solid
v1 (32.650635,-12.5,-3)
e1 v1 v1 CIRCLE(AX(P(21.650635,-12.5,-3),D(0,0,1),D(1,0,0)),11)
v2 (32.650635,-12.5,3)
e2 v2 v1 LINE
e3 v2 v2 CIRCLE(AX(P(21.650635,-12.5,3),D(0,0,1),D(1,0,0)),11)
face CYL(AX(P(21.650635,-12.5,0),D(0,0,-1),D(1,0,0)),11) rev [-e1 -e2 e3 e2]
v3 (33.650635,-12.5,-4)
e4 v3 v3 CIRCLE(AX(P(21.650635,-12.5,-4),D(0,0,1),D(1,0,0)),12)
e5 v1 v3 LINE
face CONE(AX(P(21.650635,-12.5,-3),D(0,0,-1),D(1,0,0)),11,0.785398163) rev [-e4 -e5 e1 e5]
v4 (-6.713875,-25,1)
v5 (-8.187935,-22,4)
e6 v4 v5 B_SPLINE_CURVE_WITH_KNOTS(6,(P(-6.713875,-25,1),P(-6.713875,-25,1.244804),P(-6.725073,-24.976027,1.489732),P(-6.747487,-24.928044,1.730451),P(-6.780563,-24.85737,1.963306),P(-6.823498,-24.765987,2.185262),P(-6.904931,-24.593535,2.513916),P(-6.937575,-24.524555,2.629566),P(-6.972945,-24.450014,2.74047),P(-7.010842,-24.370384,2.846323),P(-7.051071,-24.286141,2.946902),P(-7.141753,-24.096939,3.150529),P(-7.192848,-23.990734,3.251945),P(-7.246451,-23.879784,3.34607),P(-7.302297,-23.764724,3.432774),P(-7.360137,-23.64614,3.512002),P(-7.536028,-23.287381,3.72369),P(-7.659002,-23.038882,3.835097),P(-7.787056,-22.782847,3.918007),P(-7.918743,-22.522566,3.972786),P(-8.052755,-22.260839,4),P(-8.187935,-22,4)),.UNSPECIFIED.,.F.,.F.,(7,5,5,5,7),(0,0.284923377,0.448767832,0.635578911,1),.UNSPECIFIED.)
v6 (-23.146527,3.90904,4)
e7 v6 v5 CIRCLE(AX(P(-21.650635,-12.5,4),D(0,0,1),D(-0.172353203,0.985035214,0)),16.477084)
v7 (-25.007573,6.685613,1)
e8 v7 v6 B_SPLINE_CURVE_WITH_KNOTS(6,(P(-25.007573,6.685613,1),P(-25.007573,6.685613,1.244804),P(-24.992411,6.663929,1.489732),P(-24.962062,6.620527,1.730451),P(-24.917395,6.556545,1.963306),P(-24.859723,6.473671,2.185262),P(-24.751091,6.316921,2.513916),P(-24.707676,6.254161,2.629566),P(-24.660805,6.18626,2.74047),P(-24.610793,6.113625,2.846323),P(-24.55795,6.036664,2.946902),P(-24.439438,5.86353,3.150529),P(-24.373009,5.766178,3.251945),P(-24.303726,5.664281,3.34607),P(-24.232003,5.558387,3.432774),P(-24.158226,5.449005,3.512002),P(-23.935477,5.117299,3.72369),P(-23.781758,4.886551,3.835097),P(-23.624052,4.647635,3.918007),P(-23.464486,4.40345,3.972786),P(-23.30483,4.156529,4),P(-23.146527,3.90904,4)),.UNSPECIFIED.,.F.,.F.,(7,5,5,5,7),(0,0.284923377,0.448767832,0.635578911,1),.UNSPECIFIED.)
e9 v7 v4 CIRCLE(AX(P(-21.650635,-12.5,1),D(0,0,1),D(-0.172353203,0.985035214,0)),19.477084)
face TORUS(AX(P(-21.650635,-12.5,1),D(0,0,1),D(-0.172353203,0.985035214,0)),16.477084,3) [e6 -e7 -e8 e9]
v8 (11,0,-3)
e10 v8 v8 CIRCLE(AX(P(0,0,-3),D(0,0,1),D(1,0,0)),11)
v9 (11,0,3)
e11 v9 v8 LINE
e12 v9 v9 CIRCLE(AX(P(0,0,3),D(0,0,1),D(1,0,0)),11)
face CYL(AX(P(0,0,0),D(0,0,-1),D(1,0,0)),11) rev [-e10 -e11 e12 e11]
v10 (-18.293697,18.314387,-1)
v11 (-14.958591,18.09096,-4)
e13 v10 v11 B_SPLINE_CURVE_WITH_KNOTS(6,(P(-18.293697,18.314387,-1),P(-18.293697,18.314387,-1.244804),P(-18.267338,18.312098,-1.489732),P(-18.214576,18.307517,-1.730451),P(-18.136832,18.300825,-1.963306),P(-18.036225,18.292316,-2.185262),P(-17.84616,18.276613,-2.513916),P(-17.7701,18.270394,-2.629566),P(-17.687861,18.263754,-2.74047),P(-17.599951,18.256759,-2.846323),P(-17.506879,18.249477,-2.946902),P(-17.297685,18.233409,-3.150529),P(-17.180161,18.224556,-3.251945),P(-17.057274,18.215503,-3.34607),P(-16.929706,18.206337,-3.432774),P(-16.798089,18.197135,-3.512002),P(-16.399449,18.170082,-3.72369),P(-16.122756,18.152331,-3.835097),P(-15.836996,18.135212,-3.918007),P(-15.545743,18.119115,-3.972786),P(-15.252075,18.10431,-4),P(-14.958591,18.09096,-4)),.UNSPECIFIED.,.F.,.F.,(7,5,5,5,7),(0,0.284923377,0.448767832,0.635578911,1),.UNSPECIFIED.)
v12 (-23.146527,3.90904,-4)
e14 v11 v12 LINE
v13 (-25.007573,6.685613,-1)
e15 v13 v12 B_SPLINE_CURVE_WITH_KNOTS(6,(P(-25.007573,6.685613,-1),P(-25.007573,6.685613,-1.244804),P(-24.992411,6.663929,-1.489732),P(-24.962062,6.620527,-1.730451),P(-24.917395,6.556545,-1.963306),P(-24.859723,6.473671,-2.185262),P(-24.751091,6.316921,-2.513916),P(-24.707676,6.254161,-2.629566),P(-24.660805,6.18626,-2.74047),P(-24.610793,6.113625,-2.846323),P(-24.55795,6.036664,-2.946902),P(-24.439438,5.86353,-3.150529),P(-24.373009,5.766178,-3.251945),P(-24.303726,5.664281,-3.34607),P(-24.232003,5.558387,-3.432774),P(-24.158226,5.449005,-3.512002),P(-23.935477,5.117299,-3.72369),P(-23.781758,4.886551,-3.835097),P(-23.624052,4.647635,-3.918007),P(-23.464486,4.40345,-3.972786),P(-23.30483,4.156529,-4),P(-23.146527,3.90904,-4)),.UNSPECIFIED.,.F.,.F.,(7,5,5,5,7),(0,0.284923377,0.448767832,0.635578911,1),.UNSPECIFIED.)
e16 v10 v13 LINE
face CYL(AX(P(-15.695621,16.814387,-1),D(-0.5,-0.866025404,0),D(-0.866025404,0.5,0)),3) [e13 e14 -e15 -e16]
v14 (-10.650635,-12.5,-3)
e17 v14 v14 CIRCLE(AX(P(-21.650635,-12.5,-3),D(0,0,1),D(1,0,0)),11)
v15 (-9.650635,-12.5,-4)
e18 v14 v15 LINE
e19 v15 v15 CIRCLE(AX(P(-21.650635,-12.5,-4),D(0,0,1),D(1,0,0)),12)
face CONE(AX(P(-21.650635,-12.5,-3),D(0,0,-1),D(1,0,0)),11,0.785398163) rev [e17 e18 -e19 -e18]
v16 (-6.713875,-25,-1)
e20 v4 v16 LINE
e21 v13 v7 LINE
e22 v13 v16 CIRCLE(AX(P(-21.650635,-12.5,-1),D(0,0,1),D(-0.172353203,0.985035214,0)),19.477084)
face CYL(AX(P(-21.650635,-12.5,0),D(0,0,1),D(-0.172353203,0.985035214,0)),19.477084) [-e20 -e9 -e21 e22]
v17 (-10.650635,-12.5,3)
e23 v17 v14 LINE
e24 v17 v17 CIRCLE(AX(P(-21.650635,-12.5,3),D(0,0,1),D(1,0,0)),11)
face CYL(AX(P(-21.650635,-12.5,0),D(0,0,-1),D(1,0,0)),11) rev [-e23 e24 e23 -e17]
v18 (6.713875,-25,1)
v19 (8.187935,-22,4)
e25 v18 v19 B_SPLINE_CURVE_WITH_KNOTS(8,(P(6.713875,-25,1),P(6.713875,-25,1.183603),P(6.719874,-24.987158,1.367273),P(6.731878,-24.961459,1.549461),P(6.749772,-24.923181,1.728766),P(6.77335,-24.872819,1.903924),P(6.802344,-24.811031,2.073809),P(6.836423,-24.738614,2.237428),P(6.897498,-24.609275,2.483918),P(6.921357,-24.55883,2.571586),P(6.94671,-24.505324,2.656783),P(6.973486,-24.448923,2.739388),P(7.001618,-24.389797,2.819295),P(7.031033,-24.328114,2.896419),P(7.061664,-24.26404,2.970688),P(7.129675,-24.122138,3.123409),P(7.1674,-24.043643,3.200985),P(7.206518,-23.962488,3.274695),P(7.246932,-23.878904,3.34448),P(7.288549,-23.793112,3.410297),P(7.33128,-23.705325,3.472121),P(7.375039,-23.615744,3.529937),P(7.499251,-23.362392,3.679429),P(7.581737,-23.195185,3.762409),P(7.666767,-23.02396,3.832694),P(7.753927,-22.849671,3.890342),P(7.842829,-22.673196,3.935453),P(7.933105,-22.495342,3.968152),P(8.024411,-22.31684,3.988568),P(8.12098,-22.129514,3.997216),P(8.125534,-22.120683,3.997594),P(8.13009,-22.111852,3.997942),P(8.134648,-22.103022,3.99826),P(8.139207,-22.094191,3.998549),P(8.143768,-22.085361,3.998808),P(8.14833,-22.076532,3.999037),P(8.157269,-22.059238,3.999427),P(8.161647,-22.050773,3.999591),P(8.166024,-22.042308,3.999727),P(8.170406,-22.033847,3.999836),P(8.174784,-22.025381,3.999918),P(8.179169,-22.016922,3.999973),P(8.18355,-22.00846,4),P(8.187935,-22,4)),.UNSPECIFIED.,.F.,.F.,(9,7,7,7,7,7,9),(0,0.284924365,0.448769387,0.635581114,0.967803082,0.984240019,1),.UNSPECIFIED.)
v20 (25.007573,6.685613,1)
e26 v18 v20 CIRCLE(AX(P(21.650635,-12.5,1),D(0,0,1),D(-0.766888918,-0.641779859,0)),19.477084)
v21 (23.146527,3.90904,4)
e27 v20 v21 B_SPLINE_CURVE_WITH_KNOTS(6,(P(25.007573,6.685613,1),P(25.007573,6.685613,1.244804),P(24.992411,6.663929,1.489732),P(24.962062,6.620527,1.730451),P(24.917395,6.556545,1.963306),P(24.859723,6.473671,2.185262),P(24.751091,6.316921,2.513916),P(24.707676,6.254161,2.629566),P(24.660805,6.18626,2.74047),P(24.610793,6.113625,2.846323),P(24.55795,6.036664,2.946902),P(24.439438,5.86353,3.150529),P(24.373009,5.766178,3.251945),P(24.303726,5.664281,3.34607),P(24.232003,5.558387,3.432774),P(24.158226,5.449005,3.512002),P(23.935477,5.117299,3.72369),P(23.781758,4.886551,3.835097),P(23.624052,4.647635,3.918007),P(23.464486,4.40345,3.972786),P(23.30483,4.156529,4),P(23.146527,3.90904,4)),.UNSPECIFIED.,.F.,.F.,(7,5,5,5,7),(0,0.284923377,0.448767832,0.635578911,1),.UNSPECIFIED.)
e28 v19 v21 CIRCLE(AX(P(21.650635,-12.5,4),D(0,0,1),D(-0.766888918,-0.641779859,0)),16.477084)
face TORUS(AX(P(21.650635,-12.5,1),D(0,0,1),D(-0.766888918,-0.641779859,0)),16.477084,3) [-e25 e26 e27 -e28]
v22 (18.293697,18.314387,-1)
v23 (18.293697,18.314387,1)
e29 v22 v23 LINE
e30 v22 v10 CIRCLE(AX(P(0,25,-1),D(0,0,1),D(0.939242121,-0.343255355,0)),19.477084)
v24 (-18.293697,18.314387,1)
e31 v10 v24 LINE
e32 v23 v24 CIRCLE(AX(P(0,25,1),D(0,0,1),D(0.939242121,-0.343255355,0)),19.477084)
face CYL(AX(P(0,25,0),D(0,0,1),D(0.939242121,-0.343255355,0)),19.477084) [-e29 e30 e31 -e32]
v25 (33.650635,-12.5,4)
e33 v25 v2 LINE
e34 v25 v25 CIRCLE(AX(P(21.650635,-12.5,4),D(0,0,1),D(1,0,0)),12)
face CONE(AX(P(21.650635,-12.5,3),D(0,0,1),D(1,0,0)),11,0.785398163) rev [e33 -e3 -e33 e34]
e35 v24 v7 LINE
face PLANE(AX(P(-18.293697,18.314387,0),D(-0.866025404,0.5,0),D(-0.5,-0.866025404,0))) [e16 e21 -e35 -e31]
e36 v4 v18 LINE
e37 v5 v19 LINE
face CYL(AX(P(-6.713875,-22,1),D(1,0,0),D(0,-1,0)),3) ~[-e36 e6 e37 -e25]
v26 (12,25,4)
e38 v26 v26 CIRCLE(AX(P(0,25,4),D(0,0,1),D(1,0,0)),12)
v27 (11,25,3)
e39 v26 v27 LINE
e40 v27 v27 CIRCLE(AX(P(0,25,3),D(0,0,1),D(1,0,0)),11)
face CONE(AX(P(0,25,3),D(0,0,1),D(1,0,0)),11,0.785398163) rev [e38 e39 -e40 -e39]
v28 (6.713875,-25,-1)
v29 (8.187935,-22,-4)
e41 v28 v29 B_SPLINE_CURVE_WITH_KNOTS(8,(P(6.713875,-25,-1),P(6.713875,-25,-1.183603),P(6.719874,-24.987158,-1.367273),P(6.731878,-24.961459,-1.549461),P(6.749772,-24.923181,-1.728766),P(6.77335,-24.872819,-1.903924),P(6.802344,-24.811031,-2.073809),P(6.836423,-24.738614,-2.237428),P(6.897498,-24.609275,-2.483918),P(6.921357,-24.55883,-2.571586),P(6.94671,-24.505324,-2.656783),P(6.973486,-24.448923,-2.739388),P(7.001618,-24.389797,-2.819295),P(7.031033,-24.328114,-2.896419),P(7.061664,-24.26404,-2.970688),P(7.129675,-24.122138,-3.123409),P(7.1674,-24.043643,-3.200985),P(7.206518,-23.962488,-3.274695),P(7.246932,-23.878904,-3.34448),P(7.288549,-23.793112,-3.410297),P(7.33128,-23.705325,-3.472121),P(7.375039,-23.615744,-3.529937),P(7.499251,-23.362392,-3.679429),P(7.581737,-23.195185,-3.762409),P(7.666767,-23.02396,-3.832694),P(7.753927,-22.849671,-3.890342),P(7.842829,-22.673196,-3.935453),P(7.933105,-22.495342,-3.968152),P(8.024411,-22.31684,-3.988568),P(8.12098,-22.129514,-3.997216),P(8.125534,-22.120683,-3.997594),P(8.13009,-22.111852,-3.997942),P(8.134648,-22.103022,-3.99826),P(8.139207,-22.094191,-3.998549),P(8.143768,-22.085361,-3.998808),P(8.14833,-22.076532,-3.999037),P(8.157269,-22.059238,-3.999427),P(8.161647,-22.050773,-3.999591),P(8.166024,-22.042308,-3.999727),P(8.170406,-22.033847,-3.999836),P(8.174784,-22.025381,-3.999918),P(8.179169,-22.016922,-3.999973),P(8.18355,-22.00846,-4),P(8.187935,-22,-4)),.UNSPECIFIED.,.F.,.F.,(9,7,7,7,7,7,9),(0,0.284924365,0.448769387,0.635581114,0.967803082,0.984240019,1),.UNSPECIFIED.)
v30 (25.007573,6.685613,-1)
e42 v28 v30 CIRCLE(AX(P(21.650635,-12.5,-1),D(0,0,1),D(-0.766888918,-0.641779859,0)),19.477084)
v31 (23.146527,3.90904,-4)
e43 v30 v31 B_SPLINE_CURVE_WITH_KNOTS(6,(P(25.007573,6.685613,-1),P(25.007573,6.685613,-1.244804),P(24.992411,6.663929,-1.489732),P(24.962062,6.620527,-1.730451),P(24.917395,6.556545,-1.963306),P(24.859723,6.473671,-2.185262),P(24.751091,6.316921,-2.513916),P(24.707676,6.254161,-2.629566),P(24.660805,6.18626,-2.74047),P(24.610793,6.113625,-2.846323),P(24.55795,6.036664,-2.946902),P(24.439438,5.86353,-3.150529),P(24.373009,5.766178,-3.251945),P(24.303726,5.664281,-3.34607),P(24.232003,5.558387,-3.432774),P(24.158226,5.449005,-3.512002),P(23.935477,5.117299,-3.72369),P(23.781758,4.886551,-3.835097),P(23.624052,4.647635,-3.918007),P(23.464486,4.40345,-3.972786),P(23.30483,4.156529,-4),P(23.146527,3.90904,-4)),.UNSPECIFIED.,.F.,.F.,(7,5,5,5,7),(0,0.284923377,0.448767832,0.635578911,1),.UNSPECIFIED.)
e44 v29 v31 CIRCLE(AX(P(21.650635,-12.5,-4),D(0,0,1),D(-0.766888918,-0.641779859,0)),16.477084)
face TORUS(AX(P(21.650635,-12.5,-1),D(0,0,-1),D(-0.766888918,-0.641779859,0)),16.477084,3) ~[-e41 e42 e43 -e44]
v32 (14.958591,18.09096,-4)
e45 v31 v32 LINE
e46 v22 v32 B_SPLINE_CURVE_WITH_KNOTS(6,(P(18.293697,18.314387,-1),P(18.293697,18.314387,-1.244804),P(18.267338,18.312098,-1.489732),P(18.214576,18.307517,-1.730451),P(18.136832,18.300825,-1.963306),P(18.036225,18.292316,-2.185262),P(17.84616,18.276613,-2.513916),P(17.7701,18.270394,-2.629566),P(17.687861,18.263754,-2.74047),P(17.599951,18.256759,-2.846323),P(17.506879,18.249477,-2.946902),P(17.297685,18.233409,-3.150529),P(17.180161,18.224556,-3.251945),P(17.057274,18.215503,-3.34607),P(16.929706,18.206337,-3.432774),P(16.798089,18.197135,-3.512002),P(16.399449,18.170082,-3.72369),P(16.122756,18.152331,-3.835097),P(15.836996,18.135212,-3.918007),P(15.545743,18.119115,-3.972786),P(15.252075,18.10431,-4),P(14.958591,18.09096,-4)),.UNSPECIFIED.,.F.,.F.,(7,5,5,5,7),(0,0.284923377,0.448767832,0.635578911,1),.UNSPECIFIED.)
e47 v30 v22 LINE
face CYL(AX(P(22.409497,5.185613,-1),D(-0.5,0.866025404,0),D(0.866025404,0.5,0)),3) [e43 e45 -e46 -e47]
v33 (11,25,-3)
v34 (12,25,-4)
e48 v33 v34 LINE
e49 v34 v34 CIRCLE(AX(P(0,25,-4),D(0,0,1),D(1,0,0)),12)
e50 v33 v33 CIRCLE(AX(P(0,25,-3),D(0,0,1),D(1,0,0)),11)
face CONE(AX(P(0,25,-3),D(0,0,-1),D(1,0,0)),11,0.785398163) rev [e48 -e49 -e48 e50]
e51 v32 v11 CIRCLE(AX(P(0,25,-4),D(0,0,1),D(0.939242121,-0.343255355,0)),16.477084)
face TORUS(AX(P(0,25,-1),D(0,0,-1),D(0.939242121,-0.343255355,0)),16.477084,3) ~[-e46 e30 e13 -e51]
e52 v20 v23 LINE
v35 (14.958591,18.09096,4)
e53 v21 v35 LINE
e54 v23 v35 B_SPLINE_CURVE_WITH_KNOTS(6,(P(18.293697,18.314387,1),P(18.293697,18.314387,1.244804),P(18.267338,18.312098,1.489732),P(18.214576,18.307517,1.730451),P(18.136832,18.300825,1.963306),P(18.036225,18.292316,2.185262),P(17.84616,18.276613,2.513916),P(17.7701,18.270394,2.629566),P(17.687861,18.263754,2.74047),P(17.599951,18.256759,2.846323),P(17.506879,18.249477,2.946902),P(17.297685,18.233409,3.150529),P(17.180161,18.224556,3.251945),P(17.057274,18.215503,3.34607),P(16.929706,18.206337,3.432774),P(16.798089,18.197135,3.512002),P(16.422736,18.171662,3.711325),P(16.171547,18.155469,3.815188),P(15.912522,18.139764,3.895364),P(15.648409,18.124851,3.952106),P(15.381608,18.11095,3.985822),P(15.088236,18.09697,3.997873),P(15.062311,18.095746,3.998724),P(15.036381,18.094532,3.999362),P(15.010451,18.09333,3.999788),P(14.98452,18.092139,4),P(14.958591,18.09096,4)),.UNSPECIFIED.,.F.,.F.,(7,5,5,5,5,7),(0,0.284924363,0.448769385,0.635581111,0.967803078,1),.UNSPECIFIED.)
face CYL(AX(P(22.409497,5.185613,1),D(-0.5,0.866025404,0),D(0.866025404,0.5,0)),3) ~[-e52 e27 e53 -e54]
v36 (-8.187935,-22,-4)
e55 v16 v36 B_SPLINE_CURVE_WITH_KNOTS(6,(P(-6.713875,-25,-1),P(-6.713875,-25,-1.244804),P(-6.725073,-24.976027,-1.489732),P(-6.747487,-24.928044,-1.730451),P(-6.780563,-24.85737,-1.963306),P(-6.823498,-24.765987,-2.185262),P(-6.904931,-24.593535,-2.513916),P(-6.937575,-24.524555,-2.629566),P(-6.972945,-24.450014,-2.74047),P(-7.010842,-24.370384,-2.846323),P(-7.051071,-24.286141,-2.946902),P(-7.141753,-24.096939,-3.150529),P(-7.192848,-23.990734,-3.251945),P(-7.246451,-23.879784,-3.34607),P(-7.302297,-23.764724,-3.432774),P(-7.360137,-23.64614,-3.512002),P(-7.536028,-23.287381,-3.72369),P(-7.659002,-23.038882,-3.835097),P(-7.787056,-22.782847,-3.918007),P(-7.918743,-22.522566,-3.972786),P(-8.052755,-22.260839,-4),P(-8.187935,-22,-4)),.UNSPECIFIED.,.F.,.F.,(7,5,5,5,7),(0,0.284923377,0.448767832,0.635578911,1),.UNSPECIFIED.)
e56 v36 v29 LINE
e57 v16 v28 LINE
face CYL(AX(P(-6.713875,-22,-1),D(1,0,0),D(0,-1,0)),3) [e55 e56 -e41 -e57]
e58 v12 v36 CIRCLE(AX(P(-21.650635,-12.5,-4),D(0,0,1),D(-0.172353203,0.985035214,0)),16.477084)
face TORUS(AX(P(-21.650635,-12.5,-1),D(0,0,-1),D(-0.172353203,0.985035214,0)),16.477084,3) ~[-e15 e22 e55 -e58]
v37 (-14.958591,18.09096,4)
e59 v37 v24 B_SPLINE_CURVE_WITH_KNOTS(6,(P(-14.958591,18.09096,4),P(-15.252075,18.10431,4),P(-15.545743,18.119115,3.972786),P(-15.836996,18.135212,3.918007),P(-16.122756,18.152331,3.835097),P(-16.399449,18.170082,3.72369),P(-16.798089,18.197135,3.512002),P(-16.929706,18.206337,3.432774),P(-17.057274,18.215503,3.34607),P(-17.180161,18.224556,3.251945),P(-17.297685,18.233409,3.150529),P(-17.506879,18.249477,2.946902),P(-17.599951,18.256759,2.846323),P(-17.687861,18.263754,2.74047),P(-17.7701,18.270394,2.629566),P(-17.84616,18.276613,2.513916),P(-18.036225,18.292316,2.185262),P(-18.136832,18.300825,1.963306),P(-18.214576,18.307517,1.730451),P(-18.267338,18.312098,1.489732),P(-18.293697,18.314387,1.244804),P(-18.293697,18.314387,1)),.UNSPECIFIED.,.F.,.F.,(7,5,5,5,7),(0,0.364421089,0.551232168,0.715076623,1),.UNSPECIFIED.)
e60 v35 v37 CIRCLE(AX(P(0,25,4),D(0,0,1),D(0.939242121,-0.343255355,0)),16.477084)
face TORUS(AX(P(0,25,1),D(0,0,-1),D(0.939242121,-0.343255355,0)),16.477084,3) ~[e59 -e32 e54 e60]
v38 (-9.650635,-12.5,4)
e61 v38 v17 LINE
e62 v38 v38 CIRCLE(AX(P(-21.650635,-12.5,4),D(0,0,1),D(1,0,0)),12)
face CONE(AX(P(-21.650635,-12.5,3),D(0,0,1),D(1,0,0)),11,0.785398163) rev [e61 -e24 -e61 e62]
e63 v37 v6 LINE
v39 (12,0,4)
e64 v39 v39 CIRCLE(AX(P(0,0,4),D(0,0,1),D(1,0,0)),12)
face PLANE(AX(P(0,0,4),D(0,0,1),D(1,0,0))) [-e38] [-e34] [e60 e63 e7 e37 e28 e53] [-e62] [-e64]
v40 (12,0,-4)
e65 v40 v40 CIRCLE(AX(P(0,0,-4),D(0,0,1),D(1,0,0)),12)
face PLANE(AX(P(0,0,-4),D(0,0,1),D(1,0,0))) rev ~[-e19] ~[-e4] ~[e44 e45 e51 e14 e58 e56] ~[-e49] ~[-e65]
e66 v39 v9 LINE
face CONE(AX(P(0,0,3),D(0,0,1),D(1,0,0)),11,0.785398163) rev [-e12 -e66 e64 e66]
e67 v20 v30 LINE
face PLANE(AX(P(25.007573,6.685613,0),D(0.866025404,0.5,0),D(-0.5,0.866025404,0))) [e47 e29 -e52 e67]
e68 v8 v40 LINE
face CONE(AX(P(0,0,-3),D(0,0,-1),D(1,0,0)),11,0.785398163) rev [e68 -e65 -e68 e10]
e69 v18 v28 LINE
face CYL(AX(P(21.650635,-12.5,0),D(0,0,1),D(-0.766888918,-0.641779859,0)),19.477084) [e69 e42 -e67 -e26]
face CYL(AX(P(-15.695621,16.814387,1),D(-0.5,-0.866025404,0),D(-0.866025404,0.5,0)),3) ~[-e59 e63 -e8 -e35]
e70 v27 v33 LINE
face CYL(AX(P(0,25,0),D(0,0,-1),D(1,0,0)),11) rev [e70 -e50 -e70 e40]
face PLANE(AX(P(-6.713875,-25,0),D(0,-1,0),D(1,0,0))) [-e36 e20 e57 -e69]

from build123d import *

# Parameters (mm, degrees)
F0_R      = 11
F1_DEPTH  = 4
F2_R      = 3
F3_SIZE   = 1
F4_SIZE   = 1
F7_R      = 2
F9_W      = 18.3584671468
F9_H      = 18.2486437261
F10_DEPTH = 25


with BuildPart() as f1:
    # F0 (on Top) → F1 (new body, symmetric)
    with BuildSketch(Plane.XY):
        with BuildLine():
            Line((25.0075728432, 6.6856132616), (18.293697346, 18.3143867384))
            ThreePointArc((18.293697346, 18.3143867384), (0, 44.4770836439), (-18.293697346, 18.3143867384))
            Line((-18.293697346, 18.3143867384), (-25.0075728432, 6.6856132616))
            ThreePointArc((-25.0075728432, 6.6856132616), (-38.5182843218, -22.2385418219), (-6.7138754972, -25))
            Line((-6.7138754972, -25), (6.7138754972, -25))
            ThreePointArc((6.7138754972, -25), (38.5182843218, -22.2385418219), (25.0075728432, 6.6856132616))
        make_face()
        with Locations((-21.6506350946, -12.5)):
            Circle(F0_R, mode=Mode.SUBTRACT)
        Circle(F0_R, mode=Mode.SUBTRACT)
        with Locations((21.6506350946, -12.5)):
            Circle(F0_R, mode=Mode.SUBTRACT)
        with Locations((0, 25)):
            Circle(F0_R, mode=Mode.SUBTRACT)
    extrude(amount=F1_DEPTH, both=True)

    # F2
    f2_edges = [f1.edges().sort_by_distance(p)[0] for p in [
        (38.518284, -22.238542, 4),
        (21.650635, 12.5, 4),
        (0, 44.477084, 4),
        (-21.650635, 12.5, 4),
        (-38.518284, -22.238542, 4),
        (0, -25, 4),
        (0, 44.477084, -4),
        (-38.518284, -22.238542, -4),
        (0, -25, -4),
        (38.518284, -22.238542, -4),
        (21.650635, 12.5, -4),
        (-21.650635, 12.5, -4),
    ]]
    fillet(f2_edges, radius=F2_R)

    # F3
    f3_edges = [f1.edges().sort_by_distance(p)[0] for p in [
        (-11, 25, 4),
        (-11, 0, 4),
        (-32.650635, -12.5, 4),
        (10.650635, -12.5, 4),
    ]]
    chamfer(f3_edges, length=F3_SIZE)

    # F4
    f4_edges = [f1.edges().sort_by_distance(p)[0] for p in [
        (-32.650635, -12.5, -4),
        (-11, 0, -4),
        (10.650635, -12.5, -4),
        (-11, 25, -4),
    ]]
    chamfer(f4_edges, length=F4_SIZE)


with BuildPart() as f6:
    # F5 (on Front) → F6 (revolve)
    with BuildSketch(Plane.XZ):
        with BuildLine():
            Line((0, 14.2753121717), (-28, 14.2753121717))
            ThreePointArc((-28, 14.2753121717), (-18.4101931298, 12.0795932054), (-10.7311751725, 5.9299378656))
            Line((-10.7311751725, 5.9299378656), (-9, -3.4046054352))
            Line((-9, -3.4046054352), (0, -3.4046054352))
            Line((0, -3.4046054352), (0, 0))
            Line((0, 0), (0, 14.2753121717))
        make_face()
    revolve(axis=Axis((0, 0, 7.1376560859), (0, 0, -1)))

    # F7#2 (call 1 of 2: OpenCascade refuses the feature's edges together)
    f7_2_edges = [f6.edges().sort_by_distance(p)[0] for p in [
        (9, 0, -3.404605),
    ]]
    fillet(f7_2_edges, radius=F7_R)

    # F7 (call 2 of 2)
    f7_edges = [f6.edges().sort_by_distance(p)[0] for p in [
        (28, 0, 14.275312),
    ]]
    fillet(f7_edges, radius=F7_R)


with BuildPart() as f10:
    # F9 (on Top) → F10 (new body)
    with BuildSketch(Plane.XY):
        with Locations((-28.5149300471, -59.2835787684)):
            Rectangle(F9_W, F9_H)
    extrude(amount=F10_DEPTH)


solid = f1.part
